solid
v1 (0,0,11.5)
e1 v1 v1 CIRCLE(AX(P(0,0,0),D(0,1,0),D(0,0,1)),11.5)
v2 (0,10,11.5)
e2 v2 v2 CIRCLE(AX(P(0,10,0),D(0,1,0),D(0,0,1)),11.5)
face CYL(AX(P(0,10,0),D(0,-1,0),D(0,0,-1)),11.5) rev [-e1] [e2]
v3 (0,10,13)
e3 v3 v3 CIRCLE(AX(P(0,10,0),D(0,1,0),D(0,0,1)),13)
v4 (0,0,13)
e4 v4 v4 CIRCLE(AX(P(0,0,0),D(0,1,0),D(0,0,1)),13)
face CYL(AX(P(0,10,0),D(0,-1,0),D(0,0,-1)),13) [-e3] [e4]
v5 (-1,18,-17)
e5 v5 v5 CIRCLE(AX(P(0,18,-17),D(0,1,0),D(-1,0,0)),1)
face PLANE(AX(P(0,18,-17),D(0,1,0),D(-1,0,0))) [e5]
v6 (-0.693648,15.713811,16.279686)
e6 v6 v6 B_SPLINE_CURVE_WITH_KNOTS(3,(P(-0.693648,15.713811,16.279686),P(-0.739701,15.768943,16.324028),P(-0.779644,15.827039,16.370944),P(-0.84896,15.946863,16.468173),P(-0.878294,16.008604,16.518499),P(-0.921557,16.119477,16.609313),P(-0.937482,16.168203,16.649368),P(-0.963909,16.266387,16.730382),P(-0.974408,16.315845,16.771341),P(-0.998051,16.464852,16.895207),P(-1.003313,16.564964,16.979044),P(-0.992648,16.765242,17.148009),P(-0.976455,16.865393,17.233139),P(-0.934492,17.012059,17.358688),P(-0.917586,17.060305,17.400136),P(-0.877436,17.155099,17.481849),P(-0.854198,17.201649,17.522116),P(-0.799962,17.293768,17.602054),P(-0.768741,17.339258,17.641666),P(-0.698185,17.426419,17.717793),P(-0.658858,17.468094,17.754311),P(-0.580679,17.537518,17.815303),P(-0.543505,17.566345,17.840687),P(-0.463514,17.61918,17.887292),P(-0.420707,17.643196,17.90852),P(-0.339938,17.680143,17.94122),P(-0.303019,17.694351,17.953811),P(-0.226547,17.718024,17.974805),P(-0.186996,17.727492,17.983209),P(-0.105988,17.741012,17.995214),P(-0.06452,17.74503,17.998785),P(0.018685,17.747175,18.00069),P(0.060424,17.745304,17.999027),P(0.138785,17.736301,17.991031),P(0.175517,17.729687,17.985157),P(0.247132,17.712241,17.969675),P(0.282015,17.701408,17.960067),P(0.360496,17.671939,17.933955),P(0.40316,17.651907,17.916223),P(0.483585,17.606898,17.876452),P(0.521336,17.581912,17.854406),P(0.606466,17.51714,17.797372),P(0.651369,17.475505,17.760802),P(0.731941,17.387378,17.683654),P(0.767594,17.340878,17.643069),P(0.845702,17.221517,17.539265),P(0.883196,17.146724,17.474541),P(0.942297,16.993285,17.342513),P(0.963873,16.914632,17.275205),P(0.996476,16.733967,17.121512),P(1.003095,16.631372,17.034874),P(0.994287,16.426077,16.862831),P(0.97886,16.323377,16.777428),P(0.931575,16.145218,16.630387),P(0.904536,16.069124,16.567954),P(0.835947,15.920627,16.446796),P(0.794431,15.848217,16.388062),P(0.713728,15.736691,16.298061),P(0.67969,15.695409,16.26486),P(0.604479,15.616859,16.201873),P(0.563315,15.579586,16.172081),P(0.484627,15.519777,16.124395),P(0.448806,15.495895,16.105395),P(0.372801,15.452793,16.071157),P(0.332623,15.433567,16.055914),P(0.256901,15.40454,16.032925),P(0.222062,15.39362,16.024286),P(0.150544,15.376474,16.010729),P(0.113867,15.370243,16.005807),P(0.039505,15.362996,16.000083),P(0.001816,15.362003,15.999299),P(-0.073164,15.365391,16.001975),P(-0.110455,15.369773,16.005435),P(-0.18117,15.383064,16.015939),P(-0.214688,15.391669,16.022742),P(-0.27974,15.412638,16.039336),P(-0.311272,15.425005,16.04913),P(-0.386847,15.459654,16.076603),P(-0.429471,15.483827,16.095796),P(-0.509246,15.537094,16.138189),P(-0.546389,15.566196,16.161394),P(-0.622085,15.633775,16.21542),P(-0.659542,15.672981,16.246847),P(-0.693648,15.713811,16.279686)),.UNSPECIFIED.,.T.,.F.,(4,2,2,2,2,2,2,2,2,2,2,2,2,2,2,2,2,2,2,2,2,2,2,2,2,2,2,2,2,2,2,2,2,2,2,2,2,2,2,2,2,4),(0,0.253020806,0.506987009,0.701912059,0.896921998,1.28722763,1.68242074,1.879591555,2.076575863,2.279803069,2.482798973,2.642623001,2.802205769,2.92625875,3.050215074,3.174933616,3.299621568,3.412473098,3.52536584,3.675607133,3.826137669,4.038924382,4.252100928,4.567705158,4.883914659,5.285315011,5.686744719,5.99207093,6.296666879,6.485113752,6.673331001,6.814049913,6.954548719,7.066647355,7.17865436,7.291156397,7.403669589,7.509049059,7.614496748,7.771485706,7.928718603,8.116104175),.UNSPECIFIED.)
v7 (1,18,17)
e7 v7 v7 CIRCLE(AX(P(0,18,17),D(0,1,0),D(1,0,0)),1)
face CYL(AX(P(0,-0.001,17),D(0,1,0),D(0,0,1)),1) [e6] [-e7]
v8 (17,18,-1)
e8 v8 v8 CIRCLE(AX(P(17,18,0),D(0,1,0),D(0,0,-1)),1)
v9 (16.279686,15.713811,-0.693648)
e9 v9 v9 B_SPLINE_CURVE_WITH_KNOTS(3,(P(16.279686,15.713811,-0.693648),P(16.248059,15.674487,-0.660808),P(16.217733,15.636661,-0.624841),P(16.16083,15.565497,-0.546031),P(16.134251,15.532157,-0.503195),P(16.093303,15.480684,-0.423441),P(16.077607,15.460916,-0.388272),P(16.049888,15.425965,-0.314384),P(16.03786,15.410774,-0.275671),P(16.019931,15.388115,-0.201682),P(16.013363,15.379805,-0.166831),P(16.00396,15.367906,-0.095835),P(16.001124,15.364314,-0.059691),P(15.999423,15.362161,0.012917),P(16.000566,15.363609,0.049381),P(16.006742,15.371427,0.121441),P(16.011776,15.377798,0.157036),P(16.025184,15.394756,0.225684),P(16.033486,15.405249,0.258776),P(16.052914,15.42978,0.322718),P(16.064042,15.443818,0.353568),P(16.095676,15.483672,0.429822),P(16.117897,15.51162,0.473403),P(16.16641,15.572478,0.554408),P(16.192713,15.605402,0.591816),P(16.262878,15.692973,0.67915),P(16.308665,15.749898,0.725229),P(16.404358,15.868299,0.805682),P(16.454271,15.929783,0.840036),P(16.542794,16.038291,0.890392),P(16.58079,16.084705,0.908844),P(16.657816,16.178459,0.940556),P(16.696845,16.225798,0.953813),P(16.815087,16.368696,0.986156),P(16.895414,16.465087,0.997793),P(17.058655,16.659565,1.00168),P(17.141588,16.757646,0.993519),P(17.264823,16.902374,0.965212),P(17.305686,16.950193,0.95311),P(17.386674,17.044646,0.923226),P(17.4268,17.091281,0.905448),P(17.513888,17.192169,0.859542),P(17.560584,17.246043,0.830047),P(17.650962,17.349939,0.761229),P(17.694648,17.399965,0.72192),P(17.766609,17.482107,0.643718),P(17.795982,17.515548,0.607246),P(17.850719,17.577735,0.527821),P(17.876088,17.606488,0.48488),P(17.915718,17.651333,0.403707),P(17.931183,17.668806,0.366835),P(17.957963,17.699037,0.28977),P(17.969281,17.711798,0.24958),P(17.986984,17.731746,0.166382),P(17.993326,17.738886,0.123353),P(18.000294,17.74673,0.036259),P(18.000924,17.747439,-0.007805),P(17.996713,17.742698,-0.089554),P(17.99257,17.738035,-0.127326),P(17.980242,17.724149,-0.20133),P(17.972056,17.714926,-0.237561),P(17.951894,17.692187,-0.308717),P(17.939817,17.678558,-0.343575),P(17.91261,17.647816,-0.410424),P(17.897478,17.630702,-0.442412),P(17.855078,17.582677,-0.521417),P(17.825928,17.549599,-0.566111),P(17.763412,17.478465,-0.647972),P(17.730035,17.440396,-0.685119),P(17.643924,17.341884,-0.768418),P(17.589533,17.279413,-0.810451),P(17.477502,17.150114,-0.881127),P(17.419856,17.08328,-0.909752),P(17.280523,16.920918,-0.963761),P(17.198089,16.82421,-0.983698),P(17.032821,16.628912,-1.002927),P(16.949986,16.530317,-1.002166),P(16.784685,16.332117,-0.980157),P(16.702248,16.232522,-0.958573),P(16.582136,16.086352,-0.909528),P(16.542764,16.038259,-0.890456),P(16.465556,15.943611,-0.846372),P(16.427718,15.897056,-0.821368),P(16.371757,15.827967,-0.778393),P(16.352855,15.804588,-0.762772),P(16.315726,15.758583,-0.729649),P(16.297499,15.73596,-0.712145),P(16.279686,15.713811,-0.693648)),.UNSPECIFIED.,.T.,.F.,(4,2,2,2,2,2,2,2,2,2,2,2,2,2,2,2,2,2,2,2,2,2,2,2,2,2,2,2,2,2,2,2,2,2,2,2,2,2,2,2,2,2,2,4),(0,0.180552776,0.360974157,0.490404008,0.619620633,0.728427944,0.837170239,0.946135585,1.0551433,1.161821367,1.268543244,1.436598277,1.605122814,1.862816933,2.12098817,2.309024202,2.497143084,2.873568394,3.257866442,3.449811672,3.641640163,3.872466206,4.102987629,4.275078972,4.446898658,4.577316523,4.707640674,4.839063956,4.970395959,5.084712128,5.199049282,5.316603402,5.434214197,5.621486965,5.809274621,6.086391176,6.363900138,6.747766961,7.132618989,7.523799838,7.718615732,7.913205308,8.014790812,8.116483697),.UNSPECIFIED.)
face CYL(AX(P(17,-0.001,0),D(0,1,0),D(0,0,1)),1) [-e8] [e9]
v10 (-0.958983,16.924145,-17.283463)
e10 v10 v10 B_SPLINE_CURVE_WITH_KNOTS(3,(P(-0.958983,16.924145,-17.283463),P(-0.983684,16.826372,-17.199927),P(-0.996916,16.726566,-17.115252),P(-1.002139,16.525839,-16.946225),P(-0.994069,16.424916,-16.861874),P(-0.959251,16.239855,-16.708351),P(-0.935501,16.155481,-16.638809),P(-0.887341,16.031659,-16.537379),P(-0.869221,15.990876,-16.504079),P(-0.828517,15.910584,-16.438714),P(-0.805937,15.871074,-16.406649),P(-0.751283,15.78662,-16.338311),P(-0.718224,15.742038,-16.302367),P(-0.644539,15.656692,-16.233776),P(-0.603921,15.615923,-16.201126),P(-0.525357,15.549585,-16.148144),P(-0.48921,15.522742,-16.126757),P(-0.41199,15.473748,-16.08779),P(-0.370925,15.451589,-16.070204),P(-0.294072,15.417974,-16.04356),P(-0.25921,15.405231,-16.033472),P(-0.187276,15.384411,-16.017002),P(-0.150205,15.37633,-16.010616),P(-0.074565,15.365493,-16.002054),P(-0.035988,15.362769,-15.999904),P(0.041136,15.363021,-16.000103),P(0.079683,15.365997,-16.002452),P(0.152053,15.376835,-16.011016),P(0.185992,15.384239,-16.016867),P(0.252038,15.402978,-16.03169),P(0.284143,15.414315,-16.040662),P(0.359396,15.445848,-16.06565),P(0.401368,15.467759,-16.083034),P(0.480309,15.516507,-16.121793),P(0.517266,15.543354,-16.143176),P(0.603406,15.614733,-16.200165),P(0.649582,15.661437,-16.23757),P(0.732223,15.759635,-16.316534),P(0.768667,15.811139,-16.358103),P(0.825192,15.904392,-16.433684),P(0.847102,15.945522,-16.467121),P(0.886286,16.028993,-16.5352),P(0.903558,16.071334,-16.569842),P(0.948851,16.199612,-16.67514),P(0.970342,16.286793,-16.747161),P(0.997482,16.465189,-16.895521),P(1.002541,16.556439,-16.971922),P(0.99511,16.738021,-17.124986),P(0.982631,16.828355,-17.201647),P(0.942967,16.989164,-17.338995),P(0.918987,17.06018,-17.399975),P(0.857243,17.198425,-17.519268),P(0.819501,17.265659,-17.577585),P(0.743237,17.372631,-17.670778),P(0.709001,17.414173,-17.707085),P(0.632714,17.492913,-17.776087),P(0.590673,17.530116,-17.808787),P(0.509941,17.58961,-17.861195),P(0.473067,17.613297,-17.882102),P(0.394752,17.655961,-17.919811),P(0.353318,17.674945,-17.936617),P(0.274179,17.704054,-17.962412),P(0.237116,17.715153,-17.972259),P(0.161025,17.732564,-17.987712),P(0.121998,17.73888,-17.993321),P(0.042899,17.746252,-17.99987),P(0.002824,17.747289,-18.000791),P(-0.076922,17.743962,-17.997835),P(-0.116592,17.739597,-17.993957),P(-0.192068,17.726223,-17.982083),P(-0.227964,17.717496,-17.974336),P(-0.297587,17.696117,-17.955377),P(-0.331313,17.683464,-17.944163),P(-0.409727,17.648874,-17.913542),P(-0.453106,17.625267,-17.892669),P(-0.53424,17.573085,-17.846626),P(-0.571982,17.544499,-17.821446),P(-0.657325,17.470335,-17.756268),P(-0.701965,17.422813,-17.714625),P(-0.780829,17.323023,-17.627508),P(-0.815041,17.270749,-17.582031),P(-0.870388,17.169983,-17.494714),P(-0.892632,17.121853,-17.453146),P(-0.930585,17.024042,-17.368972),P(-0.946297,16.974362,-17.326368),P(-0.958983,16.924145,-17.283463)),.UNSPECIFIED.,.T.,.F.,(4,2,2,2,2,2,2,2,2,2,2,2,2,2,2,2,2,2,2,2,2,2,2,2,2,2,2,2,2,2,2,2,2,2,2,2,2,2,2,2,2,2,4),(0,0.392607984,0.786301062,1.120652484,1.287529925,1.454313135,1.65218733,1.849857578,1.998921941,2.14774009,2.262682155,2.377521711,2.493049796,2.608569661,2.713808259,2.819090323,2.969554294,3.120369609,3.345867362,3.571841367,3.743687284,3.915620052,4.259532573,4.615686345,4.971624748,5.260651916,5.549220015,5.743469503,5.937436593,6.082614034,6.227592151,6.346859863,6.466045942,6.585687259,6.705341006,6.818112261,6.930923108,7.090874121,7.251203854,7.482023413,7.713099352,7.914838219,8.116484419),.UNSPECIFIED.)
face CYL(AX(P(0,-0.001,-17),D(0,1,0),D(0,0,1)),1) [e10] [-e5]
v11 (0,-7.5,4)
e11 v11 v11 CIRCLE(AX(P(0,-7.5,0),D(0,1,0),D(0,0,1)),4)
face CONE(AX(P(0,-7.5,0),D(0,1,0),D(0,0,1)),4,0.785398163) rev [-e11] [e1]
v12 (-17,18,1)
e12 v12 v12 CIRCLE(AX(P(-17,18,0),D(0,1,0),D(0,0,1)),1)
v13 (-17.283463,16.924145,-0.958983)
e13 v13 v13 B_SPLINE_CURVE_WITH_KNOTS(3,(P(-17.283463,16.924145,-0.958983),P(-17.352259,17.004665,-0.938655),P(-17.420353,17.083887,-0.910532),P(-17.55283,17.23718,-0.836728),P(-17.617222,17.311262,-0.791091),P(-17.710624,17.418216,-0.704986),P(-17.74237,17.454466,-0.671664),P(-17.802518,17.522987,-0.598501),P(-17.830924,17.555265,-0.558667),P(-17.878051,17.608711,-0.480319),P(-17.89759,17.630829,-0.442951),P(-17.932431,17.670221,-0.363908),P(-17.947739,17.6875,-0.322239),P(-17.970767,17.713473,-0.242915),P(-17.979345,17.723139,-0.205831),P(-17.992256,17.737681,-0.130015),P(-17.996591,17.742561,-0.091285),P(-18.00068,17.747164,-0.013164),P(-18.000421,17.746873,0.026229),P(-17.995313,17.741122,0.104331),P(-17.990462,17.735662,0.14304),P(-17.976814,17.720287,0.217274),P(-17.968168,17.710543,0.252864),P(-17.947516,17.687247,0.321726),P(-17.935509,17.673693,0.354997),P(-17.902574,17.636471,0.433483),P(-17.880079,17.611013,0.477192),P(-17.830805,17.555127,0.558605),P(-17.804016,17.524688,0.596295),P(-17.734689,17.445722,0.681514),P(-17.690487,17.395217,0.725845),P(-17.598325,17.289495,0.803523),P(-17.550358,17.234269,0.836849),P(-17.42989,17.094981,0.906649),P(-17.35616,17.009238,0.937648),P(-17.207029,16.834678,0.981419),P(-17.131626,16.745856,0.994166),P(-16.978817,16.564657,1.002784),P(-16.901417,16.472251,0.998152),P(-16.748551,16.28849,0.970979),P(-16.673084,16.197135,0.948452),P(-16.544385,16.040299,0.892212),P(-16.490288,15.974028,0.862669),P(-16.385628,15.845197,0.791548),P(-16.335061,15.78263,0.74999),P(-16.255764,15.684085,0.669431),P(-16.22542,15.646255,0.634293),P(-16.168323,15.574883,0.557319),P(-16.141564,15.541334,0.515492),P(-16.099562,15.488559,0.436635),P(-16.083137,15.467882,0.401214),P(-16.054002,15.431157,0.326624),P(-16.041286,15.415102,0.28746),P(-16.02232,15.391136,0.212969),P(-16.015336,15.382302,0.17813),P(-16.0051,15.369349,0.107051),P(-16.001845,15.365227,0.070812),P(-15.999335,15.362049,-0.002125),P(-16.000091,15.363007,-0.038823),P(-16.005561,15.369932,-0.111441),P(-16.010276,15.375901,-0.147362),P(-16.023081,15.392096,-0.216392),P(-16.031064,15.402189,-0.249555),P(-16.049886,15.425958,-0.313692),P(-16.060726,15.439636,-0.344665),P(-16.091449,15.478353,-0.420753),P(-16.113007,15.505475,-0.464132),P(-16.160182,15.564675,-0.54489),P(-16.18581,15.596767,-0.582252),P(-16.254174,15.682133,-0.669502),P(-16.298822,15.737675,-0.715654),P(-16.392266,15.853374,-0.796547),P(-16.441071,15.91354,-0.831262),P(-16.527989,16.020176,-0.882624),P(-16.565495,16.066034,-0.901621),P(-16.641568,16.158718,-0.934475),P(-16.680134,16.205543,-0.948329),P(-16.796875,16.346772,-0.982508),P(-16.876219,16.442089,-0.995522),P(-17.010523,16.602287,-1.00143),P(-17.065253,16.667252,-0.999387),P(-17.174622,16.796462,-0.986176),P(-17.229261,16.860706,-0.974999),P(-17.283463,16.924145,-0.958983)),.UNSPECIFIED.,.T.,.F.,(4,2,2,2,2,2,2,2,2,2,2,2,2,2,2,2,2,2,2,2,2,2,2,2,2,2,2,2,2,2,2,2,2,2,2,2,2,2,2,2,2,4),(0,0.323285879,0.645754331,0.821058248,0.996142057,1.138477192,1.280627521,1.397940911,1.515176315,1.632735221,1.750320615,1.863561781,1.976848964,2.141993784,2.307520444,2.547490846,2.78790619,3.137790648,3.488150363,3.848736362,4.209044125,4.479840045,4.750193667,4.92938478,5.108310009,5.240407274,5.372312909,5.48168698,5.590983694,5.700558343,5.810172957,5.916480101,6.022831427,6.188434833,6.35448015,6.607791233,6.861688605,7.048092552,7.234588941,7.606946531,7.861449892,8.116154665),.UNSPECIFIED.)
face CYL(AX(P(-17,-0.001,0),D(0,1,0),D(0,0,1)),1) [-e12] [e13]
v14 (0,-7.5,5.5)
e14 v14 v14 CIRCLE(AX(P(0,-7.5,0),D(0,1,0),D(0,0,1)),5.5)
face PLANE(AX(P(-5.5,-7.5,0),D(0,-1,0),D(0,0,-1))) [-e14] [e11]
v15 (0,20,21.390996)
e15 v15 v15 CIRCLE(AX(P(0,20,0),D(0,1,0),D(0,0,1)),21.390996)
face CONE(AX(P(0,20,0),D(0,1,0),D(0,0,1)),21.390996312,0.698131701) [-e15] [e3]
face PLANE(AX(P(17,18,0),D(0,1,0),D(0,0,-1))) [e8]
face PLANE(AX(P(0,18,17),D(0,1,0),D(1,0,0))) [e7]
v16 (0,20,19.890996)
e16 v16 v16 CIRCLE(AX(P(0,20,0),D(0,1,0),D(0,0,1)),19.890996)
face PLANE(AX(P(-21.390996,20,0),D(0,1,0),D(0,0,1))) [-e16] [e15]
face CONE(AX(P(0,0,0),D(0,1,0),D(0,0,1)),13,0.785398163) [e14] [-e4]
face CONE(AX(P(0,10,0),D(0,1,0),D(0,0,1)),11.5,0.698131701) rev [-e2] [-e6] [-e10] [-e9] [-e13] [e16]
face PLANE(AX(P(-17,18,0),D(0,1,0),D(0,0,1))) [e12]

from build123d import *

# Parameters (mm, degrees)
SKETCH1_R           = 13
SKETCH1_R_2         = 11.5
BOSS_EXTRUDE1_DEPTH = 10
BOSS_EXTRUDE2_REACH = 40.265
BOSS_EXTRUDE2_START = -2
SKETCH5_R           = 1
CIRPATTERN1_COUNT   = 4


with BuildPart() as part:
    # Sketch1 → Boss-Extrude1 (new body)
    with BuildSketch(Plane(origin=(0, 0, 0), x_dir=(1, 0, 0), z_dir=(0, 1, 0))):
        with Locations(Location((0, 0, 0), (0, 0, 270))):
            Circle(SKETCH1_R)
        with Locations(Location((0, 0, 0), (0, 0, 270))):
            Circle(SKETCH1_R_2, mode=Mode.SUBTRACT)
    extrude(amount=BOSS_EXTRUDE1_DEPTH)

    # Sketch4 → Revolve1 (revolve)
    with BuildSketch(Plane.XY, mode=Mode.PRIVATE) as revolve1_sk:
        Polygon((-13, 10), (-21.390996312, 20), (-19.890996312, 20), (-11.5, 10), align=None)
    revolve(revolve1_sk.sketch.rotate(Axis((0, 18.930839499, 0), (0, -1, 0)), 270), axis=Axis((0, 18.930839499, 0), (0, -1, 0)))

    # Sketch5 → Boss-Extrude2 (add, up to next)
    with BuildSketch(Plane(origin=(0, 20, 0), x_dir=(1, 0, 0), z_dir=(0, 1, 0)).offset(BOSS_EXTRUDE2_START), mode=Mode.PRIVATE) as boss_extrude2_sk1:
        with Locations(Location((-17, 0, 0), (0, 0, 270))):
            Circle(SKETCH5_R)
    boss_extrude2_tool1 = extrude(boss_extrude2_sk1.sketch, amount=-BOSS_EXTRUDE2_REACH, mode=Mode.PRIVATE) - part.part
    boss_extrude2 = boss_extrude2_tool1.solids().sort_by_distance((-17, 18, 0))[0]
    add(boss_extrude2)

    # CirPattern1: Boss-Extrude2 ×4 about axis
    cirpattern1_axis = Axis((0, 0, 0), (0, 1, 0))
    for i in range(1, CIRPATTERN1_COUNT):
        add(boss_extrude2.rotate(cirpattern1_axis, i * 360 / CIRPATTERN1_COUNT))

    # Sketch6 → Revolve2 (revolve)
    with BuildSketch(Plane.XY, mode=Mode.PRIVATE) as revolve2_sk:
        Polygon((-13, 0), (-5.5, -7.5), (-4, -7.5), (-11.5, 0), align=None)
    revolve(revolve2_sk.sketch.rotate(Axis((0, 18.930839499, 0), (0, -1, 0)), 270), axis=Axis((0, 18.930839499, 0), (0, -1, 0)))


solid = part.part
